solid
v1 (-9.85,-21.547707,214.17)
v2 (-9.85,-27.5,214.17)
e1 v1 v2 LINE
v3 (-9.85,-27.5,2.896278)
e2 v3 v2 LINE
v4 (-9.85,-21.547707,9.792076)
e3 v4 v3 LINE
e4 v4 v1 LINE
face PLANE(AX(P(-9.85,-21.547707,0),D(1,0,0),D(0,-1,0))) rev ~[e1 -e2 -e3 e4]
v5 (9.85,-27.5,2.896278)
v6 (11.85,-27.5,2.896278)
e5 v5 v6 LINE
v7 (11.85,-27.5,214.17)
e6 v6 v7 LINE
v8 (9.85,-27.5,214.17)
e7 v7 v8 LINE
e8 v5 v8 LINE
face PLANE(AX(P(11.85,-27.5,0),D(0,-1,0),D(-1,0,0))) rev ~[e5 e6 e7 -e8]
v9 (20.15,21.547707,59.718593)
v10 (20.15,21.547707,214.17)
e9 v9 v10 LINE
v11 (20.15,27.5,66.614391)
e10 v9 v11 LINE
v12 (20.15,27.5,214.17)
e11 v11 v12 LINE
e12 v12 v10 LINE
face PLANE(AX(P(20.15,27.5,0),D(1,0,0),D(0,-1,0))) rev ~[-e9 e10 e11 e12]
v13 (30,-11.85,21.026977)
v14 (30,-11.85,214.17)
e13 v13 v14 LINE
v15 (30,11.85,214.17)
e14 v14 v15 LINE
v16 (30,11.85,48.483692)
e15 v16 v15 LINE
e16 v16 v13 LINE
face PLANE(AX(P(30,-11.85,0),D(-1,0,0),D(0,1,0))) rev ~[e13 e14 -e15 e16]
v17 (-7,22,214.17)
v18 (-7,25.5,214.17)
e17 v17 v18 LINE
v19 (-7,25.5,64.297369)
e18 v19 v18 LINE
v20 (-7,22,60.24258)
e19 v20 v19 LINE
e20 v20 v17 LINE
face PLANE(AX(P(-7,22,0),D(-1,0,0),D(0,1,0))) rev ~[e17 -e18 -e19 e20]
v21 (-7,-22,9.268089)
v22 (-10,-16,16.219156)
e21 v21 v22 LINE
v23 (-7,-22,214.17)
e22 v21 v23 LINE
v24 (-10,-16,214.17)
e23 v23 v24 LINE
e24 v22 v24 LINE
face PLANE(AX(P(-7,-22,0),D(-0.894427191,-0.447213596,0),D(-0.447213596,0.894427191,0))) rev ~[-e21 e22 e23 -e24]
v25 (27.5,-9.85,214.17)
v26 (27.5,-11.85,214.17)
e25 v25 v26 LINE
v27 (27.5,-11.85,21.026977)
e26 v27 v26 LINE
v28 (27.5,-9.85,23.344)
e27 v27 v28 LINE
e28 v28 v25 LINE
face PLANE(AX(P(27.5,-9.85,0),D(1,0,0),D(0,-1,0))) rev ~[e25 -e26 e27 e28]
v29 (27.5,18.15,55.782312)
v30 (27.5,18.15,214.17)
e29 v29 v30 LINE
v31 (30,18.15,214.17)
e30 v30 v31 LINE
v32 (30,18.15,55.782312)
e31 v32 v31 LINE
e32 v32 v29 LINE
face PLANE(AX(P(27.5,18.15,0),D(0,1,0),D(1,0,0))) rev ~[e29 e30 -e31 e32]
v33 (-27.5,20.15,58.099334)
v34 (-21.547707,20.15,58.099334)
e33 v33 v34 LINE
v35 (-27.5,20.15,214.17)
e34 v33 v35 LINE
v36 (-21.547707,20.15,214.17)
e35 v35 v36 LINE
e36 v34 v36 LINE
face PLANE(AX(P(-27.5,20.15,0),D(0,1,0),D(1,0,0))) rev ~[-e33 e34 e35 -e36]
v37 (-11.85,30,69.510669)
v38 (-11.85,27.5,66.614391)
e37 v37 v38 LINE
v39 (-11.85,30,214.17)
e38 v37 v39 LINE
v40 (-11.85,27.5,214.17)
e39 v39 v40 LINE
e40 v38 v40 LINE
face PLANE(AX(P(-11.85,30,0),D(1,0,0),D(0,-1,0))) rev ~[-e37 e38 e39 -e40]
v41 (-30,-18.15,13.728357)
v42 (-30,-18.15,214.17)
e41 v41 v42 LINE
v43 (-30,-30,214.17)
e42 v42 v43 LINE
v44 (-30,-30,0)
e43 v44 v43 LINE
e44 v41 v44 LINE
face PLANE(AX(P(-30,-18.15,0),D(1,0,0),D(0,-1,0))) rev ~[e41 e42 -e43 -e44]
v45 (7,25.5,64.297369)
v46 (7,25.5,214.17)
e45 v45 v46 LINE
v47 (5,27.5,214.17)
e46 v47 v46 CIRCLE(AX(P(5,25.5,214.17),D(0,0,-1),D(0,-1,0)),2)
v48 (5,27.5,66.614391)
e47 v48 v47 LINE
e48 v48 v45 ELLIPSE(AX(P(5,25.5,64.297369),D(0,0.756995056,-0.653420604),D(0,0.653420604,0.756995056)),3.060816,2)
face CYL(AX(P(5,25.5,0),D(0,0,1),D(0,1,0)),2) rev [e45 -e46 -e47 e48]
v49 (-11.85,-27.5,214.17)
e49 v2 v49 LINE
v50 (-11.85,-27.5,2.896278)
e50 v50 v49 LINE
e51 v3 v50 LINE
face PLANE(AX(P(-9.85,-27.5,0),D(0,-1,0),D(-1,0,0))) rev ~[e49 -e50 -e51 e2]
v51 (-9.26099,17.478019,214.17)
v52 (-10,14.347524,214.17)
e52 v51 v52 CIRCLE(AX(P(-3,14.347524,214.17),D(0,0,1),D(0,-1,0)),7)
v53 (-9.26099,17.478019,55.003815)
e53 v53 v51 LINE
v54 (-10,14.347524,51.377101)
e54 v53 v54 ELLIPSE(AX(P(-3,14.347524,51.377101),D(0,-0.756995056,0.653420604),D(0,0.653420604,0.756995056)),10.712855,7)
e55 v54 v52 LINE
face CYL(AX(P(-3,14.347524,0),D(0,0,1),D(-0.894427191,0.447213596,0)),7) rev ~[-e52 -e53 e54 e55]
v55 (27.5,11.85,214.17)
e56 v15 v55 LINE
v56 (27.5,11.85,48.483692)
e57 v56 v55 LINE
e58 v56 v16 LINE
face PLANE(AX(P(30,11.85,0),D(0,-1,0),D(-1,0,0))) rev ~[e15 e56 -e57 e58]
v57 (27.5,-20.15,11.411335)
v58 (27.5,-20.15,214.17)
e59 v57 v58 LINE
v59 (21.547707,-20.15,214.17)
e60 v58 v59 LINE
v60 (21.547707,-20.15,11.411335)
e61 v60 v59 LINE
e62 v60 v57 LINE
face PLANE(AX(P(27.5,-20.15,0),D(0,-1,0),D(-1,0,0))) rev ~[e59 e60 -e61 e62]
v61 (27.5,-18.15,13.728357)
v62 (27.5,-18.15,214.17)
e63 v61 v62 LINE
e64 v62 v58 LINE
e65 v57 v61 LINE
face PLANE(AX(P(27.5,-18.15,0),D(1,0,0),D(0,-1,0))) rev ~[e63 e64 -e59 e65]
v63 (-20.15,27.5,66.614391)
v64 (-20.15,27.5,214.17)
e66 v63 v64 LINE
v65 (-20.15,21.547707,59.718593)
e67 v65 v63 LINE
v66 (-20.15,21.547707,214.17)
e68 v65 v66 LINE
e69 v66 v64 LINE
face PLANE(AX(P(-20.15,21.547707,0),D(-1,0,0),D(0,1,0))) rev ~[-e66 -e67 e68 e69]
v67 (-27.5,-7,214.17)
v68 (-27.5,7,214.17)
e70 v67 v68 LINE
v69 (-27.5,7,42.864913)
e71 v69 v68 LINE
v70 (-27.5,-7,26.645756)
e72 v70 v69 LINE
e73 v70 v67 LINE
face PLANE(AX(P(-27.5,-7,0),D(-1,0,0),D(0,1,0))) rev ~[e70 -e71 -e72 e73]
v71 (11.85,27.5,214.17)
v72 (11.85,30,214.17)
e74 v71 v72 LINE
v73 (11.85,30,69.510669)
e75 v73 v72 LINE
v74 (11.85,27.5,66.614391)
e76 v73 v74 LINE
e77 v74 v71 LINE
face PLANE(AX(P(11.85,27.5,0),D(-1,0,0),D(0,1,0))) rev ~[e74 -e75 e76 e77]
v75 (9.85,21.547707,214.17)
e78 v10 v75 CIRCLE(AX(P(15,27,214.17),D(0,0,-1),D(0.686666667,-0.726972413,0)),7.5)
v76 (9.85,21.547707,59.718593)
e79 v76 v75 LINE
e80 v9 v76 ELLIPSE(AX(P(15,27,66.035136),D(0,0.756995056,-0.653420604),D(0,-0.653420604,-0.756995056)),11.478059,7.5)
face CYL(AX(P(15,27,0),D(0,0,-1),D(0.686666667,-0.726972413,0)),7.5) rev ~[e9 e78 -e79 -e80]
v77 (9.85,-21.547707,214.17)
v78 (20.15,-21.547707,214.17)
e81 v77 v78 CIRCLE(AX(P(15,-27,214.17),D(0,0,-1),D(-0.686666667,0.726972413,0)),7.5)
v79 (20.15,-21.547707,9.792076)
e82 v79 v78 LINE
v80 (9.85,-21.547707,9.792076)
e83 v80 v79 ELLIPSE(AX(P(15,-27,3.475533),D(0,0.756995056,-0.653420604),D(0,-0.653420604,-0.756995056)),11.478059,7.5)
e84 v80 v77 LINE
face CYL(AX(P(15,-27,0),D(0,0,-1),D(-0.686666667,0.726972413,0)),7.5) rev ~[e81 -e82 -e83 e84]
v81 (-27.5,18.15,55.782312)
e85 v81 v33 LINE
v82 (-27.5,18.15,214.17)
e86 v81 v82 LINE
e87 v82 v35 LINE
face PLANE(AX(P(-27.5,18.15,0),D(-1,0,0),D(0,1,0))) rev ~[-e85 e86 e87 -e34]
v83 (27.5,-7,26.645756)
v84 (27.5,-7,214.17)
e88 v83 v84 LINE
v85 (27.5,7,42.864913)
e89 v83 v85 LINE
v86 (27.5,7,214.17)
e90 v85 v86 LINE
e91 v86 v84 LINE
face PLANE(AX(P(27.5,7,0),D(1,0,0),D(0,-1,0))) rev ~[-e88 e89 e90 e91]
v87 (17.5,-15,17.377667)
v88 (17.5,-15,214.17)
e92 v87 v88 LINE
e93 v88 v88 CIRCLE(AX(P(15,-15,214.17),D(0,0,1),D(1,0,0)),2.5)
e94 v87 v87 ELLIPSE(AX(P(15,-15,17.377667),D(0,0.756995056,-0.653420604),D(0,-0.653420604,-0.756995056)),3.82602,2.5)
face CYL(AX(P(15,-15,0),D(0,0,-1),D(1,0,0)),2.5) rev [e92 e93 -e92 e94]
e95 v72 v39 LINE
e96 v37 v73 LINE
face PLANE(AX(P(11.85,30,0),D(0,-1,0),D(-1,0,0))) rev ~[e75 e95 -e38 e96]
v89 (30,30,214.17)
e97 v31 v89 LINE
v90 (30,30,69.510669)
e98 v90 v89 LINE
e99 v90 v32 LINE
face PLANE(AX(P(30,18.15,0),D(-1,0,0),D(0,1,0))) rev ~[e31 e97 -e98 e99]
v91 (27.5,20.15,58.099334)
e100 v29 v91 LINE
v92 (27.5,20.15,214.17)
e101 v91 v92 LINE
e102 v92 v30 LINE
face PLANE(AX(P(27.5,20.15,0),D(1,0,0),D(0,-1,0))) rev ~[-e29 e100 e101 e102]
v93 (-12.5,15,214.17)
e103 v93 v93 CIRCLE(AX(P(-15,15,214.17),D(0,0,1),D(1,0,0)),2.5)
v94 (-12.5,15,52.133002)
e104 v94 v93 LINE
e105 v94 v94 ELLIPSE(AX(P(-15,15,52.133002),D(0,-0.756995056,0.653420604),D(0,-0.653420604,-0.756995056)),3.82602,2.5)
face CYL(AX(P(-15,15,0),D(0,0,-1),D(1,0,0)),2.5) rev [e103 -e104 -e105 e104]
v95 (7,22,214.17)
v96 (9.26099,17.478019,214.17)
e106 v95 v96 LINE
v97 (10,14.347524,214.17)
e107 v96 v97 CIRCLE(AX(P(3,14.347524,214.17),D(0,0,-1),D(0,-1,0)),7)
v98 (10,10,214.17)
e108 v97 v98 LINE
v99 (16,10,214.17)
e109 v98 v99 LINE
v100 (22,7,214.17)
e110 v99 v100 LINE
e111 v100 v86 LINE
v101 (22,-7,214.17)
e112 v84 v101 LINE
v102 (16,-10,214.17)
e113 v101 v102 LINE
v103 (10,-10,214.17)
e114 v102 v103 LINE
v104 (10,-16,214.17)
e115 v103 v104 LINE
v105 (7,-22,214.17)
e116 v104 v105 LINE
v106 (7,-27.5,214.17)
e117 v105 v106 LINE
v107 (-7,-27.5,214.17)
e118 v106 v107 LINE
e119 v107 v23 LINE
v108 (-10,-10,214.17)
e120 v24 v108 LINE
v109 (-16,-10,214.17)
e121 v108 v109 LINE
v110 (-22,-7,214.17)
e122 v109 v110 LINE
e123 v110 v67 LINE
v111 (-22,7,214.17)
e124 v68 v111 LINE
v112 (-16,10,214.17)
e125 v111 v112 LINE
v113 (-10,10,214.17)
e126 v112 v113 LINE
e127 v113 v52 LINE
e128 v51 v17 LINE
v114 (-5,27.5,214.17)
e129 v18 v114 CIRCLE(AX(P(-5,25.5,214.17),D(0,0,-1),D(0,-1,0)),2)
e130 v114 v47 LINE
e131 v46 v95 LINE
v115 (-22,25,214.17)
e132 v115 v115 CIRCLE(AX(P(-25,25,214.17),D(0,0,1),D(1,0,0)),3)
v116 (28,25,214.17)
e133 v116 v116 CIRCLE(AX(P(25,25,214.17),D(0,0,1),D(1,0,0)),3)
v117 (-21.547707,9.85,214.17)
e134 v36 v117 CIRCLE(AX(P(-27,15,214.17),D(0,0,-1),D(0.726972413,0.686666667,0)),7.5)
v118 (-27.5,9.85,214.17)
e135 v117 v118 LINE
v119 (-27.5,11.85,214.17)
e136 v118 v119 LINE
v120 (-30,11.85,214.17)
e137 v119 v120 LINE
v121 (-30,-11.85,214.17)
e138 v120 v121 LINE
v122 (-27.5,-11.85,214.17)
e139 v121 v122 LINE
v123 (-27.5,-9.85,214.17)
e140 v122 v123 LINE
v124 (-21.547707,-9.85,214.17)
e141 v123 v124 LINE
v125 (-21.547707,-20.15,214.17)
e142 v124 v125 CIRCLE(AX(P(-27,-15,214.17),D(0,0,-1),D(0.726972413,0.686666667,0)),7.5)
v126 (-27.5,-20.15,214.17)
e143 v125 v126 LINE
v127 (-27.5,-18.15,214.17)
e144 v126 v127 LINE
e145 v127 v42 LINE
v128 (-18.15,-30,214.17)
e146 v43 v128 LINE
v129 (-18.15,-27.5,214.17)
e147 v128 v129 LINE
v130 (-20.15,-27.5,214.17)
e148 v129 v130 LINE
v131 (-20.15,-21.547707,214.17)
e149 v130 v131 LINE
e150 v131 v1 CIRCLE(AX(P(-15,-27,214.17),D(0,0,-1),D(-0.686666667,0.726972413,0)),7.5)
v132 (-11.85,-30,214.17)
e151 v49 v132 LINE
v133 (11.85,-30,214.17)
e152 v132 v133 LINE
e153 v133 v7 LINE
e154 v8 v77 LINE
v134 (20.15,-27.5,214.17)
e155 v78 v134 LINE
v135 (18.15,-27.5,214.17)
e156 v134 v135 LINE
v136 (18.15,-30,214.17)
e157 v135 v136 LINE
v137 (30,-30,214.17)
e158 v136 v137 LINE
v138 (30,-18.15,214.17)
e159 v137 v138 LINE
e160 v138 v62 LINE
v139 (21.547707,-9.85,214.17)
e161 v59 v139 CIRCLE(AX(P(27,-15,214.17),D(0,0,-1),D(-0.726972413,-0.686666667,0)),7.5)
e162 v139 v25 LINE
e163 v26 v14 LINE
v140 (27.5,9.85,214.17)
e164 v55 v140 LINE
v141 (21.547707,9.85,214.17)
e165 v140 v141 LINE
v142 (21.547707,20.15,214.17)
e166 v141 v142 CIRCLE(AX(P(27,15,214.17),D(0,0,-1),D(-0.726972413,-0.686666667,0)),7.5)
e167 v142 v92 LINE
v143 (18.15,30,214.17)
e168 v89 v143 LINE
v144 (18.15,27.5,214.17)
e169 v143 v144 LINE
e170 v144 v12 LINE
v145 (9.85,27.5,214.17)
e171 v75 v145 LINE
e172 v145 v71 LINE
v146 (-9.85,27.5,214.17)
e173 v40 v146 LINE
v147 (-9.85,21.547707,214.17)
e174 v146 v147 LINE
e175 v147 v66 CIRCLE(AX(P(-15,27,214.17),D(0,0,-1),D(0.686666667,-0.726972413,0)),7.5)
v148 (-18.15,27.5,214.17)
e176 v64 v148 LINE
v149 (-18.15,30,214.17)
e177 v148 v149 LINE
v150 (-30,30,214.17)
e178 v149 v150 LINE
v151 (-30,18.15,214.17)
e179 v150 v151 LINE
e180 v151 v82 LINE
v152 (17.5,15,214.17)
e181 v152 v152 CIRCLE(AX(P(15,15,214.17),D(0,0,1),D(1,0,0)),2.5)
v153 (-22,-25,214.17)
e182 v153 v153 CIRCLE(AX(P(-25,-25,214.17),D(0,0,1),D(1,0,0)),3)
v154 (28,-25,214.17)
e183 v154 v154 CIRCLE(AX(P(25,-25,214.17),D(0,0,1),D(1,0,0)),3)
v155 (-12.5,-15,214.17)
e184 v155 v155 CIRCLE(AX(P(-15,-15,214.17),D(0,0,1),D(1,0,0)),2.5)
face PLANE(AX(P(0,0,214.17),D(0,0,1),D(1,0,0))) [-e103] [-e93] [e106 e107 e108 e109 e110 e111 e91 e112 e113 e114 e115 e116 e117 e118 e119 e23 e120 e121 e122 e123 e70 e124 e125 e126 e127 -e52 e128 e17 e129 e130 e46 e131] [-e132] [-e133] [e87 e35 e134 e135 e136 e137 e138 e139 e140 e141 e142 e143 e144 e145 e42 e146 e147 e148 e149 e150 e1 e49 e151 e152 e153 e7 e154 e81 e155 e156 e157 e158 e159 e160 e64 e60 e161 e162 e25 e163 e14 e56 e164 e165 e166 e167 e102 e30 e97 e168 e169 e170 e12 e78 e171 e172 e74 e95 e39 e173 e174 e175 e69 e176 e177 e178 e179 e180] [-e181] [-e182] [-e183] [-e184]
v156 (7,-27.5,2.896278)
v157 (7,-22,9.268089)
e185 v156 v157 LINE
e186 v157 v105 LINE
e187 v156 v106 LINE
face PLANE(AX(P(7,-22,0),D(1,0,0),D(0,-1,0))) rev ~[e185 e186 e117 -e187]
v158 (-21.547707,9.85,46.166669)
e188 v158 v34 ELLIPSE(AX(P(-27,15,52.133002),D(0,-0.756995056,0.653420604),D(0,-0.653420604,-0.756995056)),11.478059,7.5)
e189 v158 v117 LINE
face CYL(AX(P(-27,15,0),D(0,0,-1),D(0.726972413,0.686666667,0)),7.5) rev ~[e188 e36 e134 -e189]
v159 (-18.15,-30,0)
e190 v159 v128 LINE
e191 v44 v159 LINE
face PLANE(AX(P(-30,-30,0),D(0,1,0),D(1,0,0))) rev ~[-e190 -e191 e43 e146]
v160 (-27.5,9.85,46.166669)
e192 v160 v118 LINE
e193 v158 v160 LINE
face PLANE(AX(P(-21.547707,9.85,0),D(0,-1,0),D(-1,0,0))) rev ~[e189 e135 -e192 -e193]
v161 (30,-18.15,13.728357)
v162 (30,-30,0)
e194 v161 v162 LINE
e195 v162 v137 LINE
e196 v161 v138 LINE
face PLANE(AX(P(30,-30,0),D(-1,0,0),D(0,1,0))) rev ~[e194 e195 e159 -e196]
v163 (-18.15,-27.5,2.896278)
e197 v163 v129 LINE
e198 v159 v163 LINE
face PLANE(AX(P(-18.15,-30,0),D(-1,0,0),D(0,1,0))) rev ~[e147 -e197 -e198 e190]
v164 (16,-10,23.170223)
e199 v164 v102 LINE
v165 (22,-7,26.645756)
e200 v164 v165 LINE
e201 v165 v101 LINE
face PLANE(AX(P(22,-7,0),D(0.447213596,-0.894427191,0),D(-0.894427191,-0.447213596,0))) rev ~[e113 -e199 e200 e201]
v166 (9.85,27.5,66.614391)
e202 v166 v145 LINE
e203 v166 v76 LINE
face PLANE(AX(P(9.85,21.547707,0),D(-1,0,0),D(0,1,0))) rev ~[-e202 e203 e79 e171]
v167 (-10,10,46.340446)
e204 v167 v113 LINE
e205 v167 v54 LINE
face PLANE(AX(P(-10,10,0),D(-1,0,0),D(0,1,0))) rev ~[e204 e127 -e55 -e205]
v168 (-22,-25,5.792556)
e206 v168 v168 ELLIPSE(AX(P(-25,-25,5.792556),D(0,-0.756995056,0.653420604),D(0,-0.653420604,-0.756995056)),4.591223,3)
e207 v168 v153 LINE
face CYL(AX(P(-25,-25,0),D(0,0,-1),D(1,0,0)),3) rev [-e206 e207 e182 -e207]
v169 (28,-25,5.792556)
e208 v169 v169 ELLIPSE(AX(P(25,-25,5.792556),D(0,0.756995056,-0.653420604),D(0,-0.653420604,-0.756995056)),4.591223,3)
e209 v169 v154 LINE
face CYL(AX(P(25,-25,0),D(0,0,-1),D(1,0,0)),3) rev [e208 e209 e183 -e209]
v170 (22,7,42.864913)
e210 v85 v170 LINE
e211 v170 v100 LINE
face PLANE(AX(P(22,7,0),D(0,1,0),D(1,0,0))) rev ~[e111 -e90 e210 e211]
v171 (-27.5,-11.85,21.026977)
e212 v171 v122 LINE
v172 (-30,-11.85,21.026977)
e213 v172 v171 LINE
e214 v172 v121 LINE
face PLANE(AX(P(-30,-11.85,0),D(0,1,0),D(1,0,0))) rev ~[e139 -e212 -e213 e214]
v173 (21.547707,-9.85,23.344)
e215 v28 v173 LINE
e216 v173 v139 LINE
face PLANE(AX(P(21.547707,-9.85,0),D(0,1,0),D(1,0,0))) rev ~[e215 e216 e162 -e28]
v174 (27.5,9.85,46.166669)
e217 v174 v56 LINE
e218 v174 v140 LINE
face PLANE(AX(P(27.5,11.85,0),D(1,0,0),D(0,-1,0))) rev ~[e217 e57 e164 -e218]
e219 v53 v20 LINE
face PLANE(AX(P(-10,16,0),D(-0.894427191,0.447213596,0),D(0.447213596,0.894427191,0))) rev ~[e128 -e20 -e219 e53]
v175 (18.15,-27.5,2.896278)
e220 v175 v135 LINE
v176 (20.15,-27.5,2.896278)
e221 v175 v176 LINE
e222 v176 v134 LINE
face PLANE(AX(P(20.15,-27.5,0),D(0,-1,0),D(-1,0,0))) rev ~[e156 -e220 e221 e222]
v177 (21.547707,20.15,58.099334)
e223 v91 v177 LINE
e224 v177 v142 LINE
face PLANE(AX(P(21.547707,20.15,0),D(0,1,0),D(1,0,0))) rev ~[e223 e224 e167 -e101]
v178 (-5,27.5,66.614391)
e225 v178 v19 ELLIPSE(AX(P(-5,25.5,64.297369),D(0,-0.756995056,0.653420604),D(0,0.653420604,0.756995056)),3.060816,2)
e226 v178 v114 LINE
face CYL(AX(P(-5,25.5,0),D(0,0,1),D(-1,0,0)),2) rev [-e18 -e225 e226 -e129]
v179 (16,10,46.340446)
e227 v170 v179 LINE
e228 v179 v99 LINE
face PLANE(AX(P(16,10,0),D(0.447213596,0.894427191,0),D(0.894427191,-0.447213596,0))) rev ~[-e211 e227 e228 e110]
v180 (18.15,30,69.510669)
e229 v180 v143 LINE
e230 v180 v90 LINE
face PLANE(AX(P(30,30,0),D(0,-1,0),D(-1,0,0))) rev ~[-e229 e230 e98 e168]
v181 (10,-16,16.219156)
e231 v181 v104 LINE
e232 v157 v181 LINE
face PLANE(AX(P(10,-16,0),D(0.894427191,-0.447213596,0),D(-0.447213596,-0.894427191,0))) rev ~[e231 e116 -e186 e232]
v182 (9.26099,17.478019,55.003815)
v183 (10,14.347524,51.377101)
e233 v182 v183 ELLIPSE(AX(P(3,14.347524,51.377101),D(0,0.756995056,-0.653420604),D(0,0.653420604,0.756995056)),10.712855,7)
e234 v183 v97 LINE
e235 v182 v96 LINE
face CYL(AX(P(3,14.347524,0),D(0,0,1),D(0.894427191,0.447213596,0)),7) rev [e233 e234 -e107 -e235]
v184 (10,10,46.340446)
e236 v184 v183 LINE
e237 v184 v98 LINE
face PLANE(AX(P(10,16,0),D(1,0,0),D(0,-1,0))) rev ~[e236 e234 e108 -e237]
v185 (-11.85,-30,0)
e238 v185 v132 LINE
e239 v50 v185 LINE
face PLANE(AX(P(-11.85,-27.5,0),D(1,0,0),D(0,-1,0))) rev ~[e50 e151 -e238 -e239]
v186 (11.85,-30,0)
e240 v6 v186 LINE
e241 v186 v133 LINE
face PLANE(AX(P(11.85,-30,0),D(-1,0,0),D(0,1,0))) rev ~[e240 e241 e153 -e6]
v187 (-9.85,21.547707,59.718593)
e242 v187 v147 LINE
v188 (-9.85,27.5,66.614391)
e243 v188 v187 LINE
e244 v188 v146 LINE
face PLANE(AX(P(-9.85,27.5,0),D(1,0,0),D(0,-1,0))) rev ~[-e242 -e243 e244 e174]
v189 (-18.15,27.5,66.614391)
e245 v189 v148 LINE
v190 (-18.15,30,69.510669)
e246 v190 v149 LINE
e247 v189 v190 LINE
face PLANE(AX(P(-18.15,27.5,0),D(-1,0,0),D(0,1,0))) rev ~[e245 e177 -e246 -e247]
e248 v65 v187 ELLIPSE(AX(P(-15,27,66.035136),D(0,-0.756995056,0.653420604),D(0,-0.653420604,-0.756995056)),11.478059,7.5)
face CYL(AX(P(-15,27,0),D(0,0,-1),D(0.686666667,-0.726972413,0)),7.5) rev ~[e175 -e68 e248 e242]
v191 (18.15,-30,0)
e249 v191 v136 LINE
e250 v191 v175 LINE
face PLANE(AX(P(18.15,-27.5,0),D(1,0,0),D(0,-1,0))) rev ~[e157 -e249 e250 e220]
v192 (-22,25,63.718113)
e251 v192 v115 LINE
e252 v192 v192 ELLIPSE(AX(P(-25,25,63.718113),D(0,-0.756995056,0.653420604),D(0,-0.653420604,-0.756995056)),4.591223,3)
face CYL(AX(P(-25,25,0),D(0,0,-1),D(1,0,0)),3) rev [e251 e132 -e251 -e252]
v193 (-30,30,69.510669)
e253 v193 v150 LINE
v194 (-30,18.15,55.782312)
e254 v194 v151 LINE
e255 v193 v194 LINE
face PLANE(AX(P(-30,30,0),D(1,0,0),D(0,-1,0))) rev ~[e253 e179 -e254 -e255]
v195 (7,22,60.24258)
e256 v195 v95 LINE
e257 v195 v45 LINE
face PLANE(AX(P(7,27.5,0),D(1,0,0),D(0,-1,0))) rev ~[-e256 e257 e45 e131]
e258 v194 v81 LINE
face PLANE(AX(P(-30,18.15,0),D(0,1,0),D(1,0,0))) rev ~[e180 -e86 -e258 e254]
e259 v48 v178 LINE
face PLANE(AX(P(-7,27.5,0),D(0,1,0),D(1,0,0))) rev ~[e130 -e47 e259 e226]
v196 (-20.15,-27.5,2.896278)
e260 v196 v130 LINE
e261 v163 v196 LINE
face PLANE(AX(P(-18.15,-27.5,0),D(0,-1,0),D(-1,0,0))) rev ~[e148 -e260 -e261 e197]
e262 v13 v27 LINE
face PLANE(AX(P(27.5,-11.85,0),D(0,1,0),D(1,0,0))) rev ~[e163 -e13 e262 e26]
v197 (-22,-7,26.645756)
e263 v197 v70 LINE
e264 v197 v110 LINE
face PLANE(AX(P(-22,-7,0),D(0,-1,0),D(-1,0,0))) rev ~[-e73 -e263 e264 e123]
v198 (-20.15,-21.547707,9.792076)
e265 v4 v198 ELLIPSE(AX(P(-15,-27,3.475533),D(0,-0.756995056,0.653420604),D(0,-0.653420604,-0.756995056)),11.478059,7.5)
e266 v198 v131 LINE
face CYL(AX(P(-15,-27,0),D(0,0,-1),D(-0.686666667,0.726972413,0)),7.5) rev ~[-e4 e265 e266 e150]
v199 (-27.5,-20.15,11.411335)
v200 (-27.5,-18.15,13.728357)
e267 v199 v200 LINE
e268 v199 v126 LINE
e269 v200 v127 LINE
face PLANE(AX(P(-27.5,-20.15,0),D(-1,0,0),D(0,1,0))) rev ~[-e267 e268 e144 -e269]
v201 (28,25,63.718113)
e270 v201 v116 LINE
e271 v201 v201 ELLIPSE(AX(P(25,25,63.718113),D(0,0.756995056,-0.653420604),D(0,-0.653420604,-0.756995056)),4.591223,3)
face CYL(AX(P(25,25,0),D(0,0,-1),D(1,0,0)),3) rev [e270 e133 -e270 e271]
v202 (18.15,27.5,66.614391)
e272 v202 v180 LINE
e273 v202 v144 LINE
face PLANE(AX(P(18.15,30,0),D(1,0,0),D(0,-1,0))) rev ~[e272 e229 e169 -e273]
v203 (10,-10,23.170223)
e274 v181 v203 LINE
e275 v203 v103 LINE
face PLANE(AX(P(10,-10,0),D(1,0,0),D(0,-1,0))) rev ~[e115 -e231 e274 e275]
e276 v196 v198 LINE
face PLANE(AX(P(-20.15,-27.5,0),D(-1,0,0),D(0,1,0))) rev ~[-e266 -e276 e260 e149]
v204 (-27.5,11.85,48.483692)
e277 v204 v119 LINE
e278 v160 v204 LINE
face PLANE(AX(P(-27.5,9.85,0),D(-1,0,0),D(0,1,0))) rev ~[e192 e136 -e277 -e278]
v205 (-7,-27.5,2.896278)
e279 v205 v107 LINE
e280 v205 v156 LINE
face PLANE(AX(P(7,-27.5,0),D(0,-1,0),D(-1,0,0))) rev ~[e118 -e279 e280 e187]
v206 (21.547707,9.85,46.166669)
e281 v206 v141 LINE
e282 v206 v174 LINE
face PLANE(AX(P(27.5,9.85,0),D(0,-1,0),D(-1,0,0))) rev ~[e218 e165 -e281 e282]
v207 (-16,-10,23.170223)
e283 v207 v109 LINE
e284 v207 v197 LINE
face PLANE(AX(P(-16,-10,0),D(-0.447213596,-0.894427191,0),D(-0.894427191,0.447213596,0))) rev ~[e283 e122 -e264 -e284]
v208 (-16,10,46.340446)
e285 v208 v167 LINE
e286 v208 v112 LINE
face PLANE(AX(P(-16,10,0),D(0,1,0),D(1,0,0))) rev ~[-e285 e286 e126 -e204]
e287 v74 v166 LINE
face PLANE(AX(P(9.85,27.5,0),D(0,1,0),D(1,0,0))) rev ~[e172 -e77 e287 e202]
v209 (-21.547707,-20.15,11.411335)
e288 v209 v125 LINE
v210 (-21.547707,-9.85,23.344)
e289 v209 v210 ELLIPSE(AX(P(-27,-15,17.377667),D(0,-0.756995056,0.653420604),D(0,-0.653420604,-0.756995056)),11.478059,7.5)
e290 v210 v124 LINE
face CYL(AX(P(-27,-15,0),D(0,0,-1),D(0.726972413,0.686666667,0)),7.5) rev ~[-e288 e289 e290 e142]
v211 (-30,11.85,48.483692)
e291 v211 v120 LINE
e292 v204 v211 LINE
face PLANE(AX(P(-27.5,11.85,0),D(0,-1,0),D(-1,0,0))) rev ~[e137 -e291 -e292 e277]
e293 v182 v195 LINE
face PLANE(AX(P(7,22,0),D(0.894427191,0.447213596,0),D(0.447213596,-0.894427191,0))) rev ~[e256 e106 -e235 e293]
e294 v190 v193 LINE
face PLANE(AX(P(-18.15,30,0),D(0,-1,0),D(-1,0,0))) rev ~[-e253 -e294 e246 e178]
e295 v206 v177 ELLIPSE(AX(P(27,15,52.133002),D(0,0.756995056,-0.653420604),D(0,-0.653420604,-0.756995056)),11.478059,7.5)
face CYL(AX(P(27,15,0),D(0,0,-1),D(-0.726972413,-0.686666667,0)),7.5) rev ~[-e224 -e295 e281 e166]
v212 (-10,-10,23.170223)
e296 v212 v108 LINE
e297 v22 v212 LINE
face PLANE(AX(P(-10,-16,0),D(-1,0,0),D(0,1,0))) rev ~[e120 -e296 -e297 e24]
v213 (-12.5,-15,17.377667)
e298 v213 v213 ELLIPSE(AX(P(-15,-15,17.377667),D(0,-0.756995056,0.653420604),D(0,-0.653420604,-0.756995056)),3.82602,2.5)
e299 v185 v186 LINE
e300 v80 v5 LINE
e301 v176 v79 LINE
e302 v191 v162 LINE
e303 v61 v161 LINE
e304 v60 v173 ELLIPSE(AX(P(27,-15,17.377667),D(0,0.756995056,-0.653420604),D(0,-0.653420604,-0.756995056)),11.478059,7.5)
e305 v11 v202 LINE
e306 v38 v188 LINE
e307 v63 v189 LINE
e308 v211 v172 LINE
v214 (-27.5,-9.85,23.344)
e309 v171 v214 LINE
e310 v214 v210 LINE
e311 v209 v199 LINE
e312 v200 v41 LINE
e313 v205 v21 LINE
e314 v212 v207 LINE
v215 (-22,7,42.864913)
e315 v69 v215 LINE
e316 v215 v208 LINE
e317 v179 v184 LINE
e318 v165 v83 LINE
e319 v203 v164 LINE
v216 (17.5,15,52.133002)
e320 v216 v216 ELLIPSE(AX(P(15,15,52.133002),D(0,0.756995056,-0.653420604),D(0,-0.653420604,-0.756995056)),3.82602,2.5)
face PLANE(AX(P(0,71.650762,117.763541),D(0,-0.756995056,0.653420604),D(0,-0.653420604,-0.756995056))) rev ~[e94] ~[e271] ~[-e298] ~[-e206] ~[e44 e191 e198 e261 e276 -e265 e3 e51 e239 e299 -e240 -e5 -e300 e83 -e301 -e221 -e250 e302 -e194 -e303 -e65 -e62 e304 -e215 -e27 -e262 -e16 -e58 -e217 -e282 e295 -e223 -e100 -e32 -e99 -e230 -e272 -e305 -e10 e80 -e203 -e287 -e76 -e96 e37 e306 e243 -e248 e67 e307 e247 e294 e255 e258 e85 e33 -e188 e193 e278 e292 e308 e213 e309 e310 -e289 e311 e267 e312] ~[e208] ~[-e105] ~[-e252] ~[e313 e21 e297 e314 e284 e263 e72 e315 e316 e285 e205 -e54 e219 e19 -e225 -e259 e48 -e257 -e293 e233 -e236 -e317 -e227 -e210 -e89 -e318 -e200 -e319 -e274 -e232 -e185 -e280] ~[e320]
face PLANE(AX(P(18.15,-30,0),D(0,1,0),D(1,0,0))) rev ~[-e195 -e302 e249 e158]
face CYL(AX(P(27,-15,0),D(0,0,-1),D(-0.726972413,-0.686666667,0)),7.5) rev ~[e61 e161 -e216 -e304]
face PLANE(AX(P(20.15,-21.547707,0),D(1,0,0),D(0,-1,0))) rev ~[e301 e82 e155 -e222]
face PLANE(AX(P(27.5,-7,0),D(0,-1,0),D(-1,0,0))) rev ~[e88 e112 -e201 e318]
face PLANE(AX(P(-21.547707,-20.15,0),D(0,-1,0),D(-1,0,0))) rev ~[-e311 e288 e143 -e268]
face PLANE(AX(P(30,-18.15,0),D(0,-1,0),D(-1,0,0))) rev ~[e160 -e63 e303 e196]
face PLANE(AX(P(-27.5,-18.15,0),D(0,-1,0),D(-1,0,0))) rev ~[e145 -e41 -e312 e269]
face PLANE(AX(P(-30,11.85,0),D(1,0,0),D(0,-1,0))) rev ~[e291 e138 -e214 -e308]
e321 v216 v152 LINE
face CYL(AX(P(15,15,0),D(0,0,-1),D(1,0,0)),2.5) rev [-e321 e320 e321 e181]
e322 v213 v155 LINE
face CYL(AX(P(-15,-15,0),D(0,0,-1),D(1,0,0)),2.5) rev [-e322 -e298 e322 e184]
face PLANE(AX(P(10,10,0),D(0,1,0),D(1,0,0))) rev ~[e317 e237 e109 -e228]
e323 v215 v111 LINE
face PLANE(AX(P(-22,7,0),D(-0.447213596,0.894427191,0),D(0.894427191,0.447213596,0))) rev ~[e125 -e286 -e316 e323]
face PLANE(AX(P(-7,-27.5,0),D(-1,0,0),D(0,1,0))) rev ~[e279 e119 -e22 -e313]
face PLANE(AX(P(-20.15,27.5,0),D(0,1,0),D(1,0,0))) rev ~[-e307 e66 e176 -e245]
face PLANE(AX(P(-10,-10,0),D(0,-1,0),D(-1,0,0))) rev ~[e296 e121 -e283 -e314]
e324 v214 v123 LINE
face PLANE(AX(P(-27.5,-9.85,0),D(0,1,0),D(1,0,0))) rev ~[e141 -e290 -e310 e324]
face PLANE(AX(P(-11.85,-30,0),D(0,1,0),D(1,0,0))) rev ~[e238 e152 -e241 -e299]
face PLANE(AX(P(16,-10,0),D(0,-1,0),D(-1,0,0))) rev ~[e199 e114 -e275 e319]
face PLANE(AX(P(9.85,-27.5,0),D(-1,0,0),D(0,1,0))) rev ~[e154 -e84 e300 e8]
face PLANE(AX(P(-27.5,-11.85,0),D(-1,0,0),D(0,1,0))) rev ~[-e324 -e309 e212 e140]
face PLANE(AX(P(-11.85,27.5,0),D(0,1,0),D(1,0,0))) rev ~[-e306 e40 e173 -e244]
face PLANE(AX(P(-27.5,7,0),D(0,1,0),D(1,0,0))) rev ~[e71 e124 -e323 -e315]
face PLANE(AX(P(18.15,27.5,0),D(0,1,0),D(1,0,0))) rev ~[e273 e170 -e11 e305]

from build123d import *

# Parameters (mm, degrees)
F0_R          = 3
F0_R_2        = 2.5
F1_DEPTH      = 214.17
F2_R          = 2
F3_R          = 7
F5_DEPTH      = 30
F5_DEPTH_BACK = 30


# Not quite as in the source:
# - a feature names something its author has since deleted; it is built from what else it names


with BuildPart() as f1:
    # F0 (on Top) → F1 (new body)
    with BuildSketch(Plane.XY):
        with BuildLine():
            Line((18.15, -30), (30, -30))
            Line((30, -30), (30, -18.15))
            Line((30, -18.15), (27.5, -18.15))
            Line((27.5, -18.15), (27.5, -20.15))
            Line((27.5, -20.15), (21.5477069044, -20.15))
            ThreePointArc((21.5477069044, -20.15), (19.5, -15), (21.5477069044, -9.85))
            Line((21.5477069044, -9.85), (27.5, -9.85))
            Line((27.5, -9.85), (27.5, -11.85))
            Line((27.5, -11.85), (30, -11.85))
            Line((30, -11.85), (30, 11.85))
            Line((30, 11.85), (27.5, 11.85))
            Line((27.5, 11.85), (27.5, 9.85))
            Line((27.5, 9.85), (21.5477069044, 9.85))
            ThreePointArc((21.5477069044, 9.85), (19.5, 15), (21.5477069044, 20.15))
            Line((21.5477069044, 20.15), (27.5, 20.15))
            Line((27.5, 20.15), (27.5, 18.15))
            Line((27.5, 18.15), (30, 18.15))
            Line((30, 18.15), (30, 30))
            Line((30, 30), (18.15, 30))
            Line((18.15, 30), (18.15, 27.5))
            Line((18.15, 27.5), (20.15, 27.5))
            Line((20.15, 27.5), (20.15, 21.5477069044))
            ThreePointArc((20.15, 21.5477069044), (15, 19.5), (9.85, 21.5477069044))
            Line((9.85, 21.5477069044), (9.85, 27.5))
            Line((9.85, 27.5), (11.85, 27.5))
            Line((11.85, 27.5), (11.85, 30))
            Line((11.85, 30), (-11.85, 30))
            Line((-11.85, 30), (-11.85, 27.5))
            Line((-11.85, 27.5), (-9.85, 27.5))
            Line((-9.85, 27.5), (-9.85, 21.5477069044))
            ThreePointArc((-9.85, 21.5477069044), (-15, 19.5), (-20.15, 21.5477069044))
            Line((-20.15, 21.5477069044), (-20.15, 27.5))
            Line((-20.15, 27.5), (-18.15, 27.5))
            Line((-18.15, 27.5), (-18.15, 30))
            Line((-18.15, 30), (-30, 30))
            Line((-30, 30), (-30, 18.15))
            Line((-30, 18.15), (-27.5, 18.15))
            Line((-27.5, 18.15), (-27.5, 20.15))
            Line((-27.5, 20.15), (-21.5477069044, 20.15))
            ThreePointArc((-21.5477069044, 20.15), (-19.5, 15), (-21.5477069044, 9.85))
            Line((-21.5477069044, 9.85), (-27.5, 9.85))
            Line((-27.5, 9.85), (-27.5, 11.85))
            Line((-27.5, 11.85), (-30, 11.85))
            Line((-30, 11.85), (-30, -11.85))
            Line((-30, -11.85), (-27.5, -11.85))
            Line((-27.5, -11.85), (-27.5, -9.85))
            Line((-27.5, -9.85), (-21.5477069044, -9.85))
            ThreePointArc((-21.5477069044, -9.85), (-19.5, -15), (-21.5477069044, -20.15))
            Line((-21.5477069044, -20.15), (-27.5, -20.15))
            Line((-27.5, -20.15), (-27.5, -18.15))
            Line((-27.5, -18.15), (-30, -18.15))
            Line((-30, -18.15), (-30, -30))
            Line((-30, -30), (-18.15, -30))
            Line((-18.15, -30), (-18.15, -27.5))
            Line((-18.15, -27.5), (-20.15, -27.5))
            Line((-20.15, -27.5), (-20.15, -21.5477069044))
            ThreePointArc((-20.15, -21.5477069044), (-15, -19.5), (-9.85, -21.5477069044))
            Line((-9.85, -21.5477069044), (-9.85, -27.5))
            Line((-9.85, -27.5), (-11.85, -27.5))
            Line((-11.85, -27.5), (-11.85, -30))
            Line((-11.85, -30), (11.85, -30))
            Line((11.85, -30), (11.85, -27.5))
            Line((11.85, -27.5), (9.85, -27.5))
            Line((9.85, -27.5), (9.85, -21.5477069044))
            ThreePointArc((9.85, -21.5477069044), (15, -19.5), (20.15, -21.5477069044))
            Line((20.15, -21.5477069044), (20.15, -27.5))
            Line((20.15, -27.5), (18.15, -27.5))
            Line((18.15, -27.5), (18.15, -30))
        make_face()
        with Locations((-25, -25)):
            Circle(F0_R, mode=Mode.SUBTRACT)
        with Locations((-15, -15)):
            Circle(F0_R_2, mode=Mode.SUBTRACT)
        with Locations((25, -25)):
            Circle(F0_R, mode=Mode.SUBTRACT)
        with Locations((15, -15)):
            Circle(F0_R_2, mode=Mode.SUBTRACT)
        with Locations((-25, 25)):
            Circle(F0_R, mode=Mode.SUBTRACT)
        with Locations((-15, 15)):
            Circle(F0_R_2, mode=Mode.SUBTRACT)
        Polygon((-7, 22), (-7, 27.5), (0, 27.5), (7, 27.5), (7, 22), (10, 16), (10, 10), (16, 10), (22, 7), (27.5, 7), (27.5, 0), (27.5, -7), (22, -7), (16, -10), (10, -10), (10, -16), (7, -22), (7, -27.5), (0, -27.5), (-7, -27.5), (-7, -22), (-10, -16), (-10, -10), (-16, -10), (-22, -7), (-27.5, -7), (-27.5, 0), (-27.5, 7), (-22, 7), (-16, 10), (-10, 10), (-10, 16), align=None, mode=Mode.SUBTRACT)
        with Locations((15, 15)):
            Circle(F0_R_2, mode=Mode.SUBTRACT)
        with Locations((25, 25)):
            Circle(F0_R, mode=Mode.SUBTRACT)
    extrude(amount=F1_DEPTH)

    # F2
    f2_edges = [f1.edges().sort_by_distance(p)[0] for p in [
        (-7, 27.5, 107.085),
        (7, 27.5, 107.085),
    ]]
    fillet(f2_edges, radius=F2_R)

    # F3
    f3_edges = [f1.edges().sort_by_distance(p)[0] for p in [
        (-10, 16, 107.085),
        (10, 16, 107.085),
    ]]
    fillet(f3_edges, radius=F3_R)

    # F4 (on Right) → F5 (cut, two sides)
    with BuildSketch(Plane.YZ) as f5_sk:
        Polygon((71.6507620084, 117.7635412378), (-30, 0), (52.6850404625, -71.3718123739), (154.335802471, 46.3917288639), align=None)
    extrude(amount=F5_DEPTH, mode=Mode.SUBTRACT)
    extrude(f5_sk.sketch, amount=-F5_DEPTH_BACK, mode=Mode.SUBTRACT)


solid = f1.part
